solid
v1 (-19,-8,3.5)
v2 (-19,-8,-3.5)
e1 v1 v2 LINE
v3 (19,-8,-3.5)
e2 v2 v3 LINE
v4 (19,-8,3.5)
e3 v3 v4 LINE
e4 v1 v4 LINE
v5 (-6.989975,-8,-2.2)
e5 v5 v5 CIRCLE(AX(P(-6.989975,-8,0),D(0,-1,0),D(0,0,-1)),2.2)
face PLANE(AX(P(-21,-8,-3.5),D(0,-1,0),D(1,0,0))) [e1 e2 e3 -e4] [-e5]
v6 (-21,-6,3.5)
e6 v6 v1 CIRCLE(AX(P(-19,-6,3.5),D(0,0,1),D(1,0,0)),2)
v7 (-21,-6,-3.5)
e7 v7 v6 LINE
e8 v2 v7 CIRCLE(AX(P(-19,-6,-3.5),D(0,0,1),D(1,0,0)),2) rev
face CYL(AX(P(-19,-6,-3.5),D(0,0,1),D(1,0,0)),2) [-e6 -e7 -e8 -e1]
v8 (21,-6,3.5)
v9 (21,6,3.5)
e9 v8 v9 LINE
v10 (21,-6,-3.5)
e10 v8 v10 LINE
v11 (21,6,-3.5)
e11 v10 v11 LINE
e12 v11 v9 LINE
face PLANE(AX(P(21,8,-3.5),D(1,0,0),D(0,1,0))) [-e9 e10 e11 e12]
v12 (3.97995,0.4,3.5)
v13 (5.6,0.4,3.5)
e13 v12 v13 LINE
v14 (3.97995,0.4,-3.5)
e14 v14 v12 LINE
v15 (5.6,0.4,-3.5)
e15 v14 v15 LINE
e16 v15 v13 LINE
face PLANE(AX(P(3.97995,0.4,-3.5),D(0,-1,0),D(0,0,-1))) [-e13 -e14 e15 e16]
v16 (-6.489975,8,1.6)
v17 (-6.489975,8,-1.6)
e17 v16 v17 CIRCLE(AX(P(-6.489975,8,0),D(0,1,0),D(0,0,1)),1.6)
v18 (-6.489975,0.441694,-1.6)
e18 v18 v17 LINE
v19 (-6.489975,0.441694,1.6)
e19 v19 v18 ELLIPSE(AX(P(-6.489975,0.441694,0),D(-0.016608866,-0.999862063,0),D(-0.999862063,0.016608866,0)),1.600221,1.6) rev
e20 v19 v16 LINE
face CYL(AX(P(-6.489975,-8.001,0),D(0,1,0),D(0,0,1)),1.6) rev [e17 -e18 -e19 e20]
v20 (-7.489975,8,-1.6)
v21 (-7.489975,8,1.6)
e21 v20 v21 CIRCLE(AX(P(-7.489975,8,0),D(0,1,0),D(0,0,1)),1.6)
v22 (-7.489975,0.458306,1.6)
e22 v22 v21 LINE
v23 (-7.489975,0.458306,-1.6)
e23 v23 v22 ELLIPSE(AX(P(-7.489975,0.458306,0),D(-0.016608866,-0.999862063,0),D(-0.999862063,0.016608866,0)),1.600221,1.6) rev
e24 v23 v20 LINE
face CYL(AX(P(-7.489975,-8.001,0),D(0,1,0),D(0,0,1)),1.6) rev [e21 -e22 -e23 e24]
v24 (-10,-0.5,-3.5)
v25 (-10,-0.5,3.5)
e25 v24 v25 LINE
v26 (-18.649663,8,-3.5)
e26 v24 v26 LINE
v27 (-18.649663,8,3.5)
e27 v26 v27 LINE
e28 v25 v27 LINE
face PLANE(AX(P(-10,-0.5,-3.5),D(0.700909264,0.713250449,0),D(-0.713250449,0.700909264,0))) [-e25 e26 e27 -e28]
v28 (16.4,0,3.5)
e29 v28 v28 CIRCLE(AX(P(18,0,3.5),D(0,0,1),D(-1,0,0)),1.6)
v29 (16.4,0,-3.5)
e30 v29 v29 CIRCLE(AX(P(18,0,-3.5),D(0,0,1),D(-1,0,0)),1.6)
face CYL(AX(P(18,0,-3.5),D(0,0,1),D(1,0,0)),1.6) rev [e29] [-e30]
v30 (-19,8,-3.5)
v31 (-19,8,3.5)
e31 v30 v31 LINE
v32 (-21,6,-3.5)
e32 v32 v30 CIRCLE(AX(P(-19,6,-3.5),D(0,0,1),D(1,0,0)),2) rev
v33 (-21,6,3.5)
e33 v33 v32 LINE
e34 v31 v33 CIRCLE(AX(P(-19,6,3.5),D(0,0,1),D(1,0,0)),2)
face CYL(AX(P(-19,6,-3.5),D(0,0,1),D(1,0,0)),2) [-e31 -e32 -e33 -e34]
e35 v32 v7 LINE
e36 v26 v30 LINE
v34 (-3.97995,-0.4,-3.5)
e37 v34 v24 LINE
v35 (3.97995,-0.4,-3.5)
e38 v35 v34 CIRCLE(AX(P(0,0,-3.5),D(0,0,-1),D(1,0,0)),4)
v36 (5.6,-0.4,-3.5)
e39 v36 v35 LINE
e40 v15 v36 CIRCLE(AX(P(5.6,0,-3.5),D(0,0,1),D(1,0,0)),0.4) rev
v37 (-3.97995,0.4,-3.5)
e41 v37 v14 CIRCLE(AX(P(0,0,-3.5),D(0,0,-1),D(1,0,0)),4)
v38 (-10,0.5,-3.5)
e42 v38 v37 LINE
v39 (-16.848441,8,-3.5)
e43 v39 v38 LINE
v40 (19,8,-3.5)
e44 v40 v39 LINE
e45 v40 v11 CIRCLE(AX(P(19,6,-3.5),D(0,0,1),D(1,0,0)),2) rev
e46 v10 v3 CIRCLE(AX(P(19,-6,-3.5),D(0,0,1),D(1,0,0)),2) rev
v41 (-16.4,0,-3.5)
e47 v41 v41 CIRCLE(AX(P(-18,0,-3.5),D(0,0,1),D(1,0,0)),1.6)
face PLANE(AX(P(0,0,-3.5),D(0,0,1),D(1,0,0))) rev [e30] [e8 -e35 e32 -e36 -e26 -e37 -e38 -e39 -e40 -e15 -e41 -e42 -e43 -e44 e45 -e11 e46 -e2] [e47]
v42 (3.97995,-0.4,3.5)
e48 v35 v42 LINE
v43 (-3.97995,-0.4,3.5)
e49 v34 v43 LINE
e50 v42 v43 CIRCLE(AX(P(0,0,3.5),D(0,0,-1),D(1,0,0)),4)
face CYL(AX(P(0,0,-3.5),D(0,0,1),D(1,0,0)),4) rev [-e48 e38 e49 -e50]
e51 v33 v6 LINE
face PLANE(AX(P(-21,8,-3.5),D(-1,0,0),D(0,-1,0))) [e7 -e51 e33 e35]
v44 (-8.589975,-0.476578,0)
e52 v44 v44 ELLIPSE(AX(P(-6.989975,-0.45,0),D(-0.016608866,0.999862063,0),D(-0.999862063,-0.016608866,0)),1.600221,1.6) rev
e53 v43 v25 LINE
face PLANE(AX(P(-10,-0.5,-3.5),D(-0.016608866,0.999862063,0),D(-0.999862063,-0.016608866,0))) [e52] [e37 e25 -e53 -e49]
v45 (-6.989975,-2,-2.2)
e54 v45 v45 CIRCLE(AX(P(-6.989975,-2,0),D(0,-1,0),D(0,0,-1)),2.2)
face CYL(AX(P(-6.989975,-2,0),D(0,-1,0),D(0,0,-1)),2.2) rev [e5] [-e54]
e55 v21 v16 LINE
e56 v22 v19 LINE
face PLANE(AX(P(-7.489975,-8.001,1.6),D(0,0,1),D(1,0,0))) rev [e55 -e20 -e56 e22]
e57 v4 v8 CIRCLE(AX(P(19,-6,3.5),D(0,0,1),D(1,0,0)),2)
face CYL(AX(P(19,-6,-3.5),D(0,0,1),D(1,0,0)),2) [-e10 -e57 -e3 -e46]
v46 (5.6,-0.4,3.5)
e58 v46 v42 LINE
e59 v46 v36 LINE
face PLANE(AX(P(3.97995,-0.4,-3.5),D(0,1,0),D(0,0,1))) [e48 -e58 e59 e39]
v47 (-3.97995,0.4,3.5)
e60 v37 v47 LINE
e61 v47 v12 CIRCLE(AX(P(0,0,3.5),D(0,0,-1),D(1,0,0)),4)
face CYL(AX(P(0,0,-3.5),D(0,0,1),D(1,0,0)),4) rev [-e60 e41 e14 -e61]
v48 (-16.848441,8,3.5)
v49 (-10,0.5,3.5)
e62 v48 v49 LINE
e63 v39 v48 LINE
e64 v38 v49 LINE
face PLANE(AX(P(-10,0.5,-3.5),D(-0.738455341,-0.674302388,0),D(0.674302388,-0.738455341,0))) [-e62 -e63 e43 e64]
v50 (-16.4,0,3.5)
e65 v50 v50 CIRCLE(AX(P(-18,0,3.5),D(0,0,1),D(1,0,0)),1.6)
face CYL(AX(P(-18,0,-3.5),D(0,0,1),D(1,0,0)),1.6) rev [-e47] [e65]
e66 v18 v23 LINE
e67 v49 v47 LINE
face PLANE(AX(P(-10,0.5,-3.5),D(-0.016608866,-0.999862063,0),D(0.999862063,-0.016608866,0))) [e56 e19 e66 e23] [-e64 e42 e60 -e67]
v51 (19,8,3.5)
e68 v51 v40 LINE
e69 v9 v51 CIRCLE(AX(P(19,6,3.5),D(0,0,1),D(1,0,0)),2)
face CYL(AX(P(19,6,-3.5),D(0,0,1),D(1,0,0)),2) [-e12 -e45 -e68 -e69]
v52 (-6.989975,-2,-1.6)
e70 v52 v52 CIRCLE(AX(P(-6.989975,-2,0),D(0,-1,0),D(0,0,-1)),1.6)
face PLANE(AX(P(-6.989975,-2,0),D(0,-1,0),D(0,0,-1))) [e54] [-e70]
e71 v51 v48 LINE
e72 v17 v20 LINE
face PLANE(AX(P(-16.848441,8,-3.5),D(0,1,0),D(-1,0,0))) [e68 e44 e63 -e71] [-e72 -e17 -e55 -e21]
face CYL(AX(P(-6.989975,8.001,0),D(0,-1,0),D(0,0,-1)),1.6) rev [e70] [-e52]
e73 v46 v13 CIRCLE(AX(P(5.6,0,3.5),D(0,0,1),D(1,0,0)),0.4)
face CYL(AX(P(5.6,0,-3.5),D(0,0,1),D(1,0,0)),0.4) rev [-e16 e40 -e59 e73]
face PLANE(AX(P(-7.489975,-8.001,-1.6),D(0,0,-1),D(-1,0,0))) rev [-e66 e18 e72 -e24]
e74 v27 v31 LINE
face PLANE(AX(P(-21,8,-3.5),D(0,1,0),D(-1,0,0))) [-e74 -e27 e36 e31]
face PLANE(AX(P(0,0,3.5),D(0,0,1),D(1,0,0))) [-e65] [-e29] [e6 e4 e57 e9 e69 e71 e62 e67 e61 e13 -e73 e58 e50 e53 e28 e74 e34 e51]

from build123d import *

# Parameters (mm, degrees)
BOSS_EXTRUDE1_DEPTH      = 3.5
BOSS_EXTRUDE1_DEPTH_BACK = 3.5
SKETCH1_R                = 1.6
CUT_EXTRUDE1_REACH       = 28.632
SKETCH3_R                = 1.6
SKETCH3_3_R              = 2.2
SKETCH3_3_R_2            = 1.6
CUT_EXTRUDE2_DEPTH       = 6
CUT_EXTRUDE3_REACH       = 28.632
FILLET1_R                = 2
FILLET2_R                = 0.4


with BuildPart() as part:
    # Sketch1 → Boss-Extrude1 (new, two sides: drawn at the far end of the back side and taken through both)
    with BuildSketch(Plane.XY.offset(-BOSS_EXTRUDE1_DEPTH_BACK)):
        with BuildLine():
            Line((-21, 8), (-18.64966284, 8))
            Line((-18.64966284, 8), (-10, -0.5))
            Line((-10, -0.5), (-3.979949748, -0.4))
            ThreePointArc((-3.979949748, -0.4), (0, -4), (3.979949748, -0.4))
            Line((3.979949748, -0.4), (6, -0.4))
            Line((6, -0.4), (6, 0.4))
            Line((6, 0.4), (3.979949748, 0.4))
            ThreePointArc((3.979949748, 0.4), (0, 4), (-3.979949748, 0.4))
            Line((-3.979949748, 0.4), (-10, 0.5))
            Line((-10, 0.5), (-16.848441102, 8))
            Line((-16.848441102, 8), (21, 8))
            Line((21, 8), (21, -8))
            Line((21, -8), (-21, -8))
            Line((-21, -8), (-21, 8))
        make_face()
        with Locations((-18, 0)):
            Circle(SKETCH1_R, mode=Mode.SUBTRACT)
        with Locations(Location((18, 0, 0), (0, 0, 180))):
            Circle(SKETCH1_R, mode=Mode.SUBTRACT)
    extrude(amount=BOSS_EXTRUDE1_DEPTH + BOSS_EXTRUDE1_DEPTH_BACK)

    # Cut-Extrude1: up to this plane
    cut_extrude1_end = Plane(origin=(-10, -0.5, -3.5), z_dir=(-0.016608865731892127, 0.9998620632762801, 0))
    # Sketch3 → Cut-Extrude1 (cut, up to the surface)
    with BuildSketch(Plane.XZ.offset(8), mode=Mode.PRIVATE) as cut_extrude1_sk1:
        with Locations(Location((-6.989974874, 0, 0), (0, 0, 270))):
            Circle(SKETCH3_R)
    cut_extrude1_tool1 = split(extrude(cut_extrude1_sk1.sketch, amount=-CUT_EXTRUDE1_REACH, mode=Mode.PRIVATE), bisect_by=cut_extrude1_end, keep=Keep.BOTH, mode=Mode.PRIVATE)
    add(cut_extrude1_tool1.solids().sort_by_distance((-6.989975, -8, 0))[0], mode=Mode.SUBTRACT)

    # Sketch3<3> → Cut-Extrude2 (cut)
    with BuildSketch(Plane.XZ.offset(8)):
        with Locations(Location((-6.989974874, 0, 0), (0, 0, 270))):
            Circle(SKETCH3_3_R)
        with Locations(Location((-6.989974874, 0, 0), (0, 0, 270))):
            Circle(SKETCH3_3_R_2, mode=Mode.SUBTRACT)
    extrude(amount=-CUT_EXTRUDE2_DEPTH, mode=Mode.SUBTRACT)

    # Cut-Extrude3: up to this plane
    cut_extrude3_end = Plane(origin=(-10, 0.5, -3.5), z_dir=(-0.016608865731892127, -0.9998620632762801, 0))
    # Sketch4 → Cut-Extrude3 (cut, up to the surface)
    with BuildSketch(Plane(origin=(0, 8, 0), x_dir=(1, 0, 0), z_dir=(0, 1, 0)), mode=Mode.PRIVATE) as cut_extrude3_sk1:
        with BuildLine():
            Line((-7.489974874, 1.6), (-6.489974874, 1.6))
            ThreePointArc((-6.489974874, 1.6), (-4.889974874, 0), (-6.489974874, -1.6))
            Line((-6.489974874, -1.6), (-7.489974874, -1.6))
            ThreePointArc((-7.489974874, -1.6), (-9.089974874, 0), (-7.489974874, 1.6))
        make_face()
    cut_extrude3_tool1 = split(extrude(cut_extrude3_sk1.sketch, amount=-CUT_EXTRUDE3_REACH, mode=Mode.PRIVATE), bisect_by=cut_extrude3_end, keep=Keep.BOTH, mode=Mode.PRIVATE)
    add(cut_extrude3_tool1.solids().sort_by_distance((-6.989975, 8, 0))[0], mode=Mode.SUBTRACT)

    # Fillet1
    fillet1_edges = [part.edges().sort_by_distance(p)[0] for p in [
        (21, 8, 0),
        (21, -8, 0),
        (-21, -8, 0),
        (-21, 8, 0),
    ]]
    fillet(fillet1_edges, radius=FILLET1_R)

    # Fillet2
    fillet2_edges = [part.edges().sort_by_distance(p)[0] for p in [
        (6, -0.4, 0),
        (6, 0.4, 0),
    ]]
    fillet(fillet2_edges, radius=FILLET2_R - 0.0001)  # a hair under: the kernel refuses the full size


solid = part.part
